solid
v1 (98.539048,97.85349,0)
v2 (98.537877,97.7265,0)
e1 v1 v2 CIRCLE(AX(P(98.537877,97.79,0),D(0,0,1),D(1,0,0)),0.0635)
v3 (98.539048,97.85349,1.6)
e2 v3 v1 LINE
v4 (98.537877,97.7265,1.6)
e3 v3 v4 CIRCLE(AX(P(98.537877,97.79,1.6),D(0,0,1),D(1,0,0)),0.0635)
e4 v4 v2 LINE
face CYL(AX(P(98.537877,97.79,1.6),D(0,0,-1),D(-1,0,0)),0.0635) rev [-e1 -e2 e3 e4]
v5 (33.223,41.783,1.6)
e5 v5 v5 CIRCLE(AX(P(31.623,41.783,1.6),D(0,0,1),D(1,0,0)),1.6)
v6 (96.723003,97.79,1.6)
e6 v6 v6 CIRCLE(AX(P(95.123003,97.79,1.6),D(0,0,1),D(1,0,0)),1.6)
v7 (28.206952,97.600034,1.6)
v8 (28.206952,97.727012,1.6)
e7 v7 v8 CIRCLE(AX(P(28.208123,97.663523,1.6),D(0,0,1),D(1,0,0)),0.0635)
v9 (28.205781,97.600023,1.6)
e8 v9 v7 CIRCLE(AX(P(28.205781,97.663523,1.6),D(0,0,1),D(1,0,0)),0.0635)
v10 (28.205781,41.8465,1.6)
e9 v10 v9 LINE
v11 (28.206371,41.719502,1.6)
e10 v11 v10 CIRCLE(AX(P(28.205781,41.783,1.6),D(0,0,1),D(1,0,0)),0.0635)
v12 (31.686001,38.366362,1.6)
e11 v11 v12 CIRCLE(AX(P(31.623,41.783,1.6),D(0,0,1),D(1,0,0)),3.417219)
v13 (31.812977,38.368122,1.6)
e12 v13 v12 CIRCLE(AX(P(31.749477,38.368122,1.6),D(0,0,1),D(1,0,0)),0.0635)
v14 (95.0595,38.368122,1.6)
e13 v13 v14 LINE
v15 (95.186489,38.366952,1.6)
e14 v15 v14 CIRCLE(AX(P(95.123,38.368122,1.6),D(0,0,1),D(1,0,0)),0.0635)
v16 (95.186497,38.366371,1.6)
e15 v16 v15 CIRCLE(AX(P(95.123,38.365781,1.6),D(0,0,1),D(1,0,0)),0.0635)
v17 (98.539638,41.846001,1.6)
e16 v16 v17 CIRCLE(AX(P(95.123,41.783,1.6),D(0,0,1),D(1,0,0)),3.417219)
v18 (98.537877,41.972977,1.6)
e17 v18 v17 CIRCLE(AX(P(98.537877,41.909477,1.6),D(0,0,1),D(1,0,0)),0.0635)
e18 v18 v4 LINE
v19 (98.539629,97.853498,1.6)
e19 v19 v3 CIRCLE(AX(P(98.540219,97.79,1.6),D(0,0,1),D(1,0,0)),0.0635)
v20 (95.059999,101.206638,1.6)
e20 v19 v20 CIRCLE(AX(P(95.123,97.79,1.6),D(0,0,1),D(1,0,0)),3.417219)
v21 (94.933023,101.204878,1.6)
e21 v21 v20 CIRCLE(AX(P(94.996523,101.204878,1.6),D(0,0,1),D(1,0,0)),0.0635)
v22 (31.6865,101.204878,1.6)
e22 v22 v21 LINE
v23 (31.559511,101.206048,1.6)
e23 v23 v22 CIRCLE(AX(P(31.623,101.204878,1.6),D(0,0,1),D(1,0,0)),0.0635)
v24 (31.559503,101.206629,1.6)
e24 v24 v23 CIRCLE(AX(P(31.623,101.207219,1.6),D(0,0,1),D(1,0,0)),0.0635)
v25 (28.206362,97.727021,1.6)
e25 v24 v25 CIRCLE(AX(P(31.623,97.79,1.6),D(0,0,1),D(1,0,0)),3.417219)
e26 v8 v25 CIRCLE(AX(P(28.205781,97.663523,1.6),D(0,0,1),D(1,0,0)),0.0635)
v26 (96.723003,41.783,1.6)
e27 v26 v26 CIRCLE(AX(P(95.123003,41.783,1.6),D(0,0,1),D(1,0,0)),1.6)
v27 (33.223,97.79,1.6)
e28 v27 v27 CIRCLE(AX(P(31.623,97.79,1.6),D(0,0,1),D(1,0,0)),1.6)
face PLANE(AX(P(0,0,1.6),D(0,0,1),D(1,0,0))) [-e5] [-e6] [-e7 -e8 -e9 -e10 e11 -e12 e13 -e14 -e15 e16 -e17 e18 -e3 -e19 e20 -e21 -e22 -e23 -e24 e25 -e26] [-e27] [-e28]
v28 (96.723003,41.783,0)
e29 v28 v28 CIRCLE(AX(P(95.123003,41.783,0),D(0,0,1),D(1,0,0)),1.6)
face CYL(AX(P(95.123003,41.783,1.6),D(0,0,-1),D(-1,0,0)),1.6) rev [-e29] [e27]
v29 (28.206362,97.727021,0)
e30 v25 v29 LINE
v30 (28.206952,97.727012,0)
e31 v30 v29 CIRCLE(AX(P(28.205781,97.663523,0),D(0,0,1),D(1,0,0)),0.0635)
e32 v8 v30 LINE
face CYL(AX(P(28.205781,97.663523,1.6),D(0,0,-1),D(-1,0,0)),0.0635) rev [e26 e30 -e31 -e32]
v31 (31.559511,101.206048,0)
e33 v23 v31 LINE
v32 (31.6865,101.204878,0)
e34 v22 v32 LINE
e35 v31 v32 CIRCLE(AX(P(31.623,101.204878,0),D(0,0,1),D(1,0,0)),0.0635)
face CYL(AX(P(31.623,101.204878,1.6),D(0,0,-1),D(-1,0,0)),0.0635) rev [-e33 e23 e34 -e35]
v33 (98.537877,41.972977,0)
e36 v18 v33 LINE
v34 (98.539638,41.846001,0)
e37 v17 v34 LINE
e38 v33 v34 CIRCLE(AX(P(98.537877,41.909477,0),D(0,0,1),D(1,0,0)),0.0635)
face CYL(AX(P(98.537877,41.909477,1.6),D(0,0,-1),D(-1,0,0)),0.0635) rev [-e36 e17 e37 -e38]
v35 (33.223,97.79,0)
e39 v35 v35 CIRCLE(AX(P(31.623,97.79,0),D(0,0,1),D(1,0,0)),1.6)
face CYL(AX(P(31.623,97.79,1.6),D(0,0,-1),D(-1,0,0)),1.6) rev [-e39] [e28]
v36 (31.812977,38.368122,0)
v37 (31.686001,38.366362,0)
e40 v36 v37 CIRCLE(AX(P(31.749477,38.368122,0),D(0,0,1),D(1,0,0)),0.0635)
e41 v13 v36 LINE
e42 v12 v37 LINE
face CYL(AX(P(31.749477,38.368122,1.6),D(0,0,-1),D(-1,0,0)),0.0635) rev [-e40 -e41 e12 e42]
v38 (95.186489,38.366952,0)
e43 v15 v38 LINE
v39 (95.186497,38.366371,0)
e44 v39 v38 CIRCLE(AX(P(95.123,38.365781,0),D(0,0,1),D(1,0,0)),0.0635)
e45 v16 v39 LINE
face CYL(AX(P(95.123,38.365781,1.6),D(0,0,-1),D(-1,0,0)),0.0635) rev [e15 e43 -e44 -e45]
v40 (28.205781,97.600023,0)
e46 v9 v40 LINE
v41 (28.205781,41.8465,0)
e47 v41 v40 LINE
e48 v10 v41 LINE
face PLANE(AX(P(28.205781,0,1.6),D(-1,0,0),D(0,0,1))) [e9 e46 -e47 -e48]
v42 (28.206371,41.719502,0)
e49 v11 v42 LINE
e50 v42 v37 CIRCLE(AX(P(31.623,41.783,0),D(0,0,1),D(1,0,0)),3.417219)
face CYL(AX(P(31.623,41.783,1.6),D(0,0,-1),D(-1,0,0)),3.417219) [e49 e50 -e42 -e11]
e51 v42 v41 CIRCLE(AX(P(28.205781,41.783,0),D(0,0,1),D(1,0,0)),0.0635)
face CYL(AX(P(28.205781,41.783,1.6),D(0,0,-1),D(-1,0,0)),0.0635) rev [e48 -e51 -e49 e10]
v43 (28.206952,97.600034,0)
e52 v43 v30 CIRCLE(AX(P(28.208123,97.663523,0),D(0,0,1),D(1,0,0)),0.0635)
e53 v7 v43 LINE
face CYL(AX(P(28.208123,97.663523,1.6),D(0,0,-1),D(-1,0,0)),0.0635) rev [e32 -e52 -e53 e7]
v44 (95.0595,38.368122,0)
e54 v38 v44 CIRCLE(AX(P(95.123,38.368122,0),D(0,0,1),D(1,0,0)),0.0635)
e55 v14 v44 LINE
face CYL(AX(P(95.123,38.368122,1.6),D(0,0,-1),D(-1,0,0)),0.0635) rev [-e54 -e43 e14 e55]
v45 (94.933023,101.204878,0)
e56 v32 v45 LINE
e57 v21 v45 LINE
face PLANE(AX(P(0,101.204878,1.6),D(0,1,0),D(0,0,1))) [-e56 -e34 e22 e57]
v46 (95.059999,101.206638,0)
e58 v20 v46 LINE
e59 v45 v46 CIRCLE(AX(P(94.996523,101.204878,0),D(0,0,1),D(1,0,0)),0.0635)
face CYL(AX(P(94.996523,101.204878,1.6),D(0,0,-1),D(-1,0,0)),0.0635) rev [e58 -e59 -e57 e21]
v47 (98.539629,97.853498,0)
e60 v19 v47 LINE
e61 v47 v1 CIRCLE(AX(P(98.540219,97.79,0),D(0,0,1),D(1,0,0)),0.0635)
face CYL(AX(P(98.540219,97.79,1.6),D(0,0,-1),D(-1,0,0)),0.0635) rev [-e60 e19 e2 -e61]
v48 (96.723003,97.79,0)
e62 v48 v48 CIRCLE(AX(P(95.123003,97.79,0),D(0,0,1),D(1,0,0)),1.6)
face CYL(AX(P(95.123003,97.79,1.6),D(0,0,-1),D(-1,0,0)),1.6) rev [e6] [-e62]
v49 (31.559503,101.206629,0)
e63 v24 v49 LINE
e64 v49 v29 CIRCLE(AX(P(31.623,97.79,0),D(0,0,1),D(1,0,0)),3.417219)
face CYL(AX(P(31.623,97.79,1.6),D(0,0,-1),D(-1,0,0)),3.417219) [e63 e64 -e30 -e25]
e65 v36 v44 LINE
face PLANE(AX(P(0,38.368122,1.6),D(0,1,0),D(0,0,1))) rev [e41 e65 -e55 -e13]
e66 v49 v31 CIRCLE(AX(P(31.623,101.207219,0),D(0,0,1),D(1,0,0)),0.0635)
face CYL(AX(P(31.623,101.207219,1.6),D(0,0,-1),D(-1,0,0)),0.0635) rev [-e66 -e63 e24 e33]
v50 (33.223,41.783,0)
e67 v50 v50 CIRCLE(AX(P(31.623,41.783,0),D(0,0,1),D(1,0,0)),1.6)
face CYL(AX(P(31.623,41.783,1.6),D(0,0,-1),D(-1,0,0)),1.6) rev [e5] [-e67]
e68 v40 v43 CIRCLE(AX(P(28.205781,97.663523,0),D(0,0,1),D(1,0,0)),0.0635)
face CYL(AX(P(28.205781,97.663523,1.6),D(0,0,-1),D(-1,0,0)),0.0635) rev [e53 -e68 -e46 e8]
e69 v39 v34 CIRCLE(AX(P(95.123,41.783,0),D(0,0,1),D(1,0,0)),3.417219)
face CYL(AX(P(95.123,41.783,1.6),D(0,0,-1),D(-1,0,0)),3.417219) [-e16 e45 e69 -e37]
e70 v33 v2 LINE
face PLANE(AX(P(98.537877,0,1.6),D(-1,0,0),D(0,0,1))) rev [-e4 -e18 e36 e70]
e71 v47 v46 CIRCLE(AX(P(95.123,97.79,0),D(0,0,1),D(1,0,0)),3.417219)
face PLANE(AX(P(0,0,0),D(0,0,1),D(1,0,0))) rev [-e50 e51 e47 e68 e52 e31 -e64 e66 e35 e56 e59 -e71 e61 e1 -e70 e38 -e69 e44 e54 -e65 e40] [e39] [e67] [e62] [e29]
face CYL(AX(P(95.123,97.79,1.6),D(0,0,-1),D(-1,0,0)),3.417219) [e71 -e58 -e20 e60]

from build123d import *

# Parameters (mm, degrees)
EXTRUDE_1_DEPTH     = 1.6
VIAHOLELAYER_R      = 1.6
CUT_EXTRUDE_2_DEPTH = 1.6


# Read off the part's stored shape, not the designer's step: 凸台-拉伸1
with BuildPart() as part:
    # 凸台-拉伸1 outline → 凸台-拉伸1 (new body)
    with BuildSketch(Plane.XY):
        with BuildLine():
            Line((28.205781396, 97.600023259), (28.205781396, 41.846499647))
            ThreePointArc((28.205781396, 41.846499647), (28.269280711, 41.783294645), (28.206371386, 41.719502388))
            ThreePointArc((28.206371386, 41.719502388), (29.251799434, 39.322351184), (31.68600117, 38.36636185))
            ThreePointArc((31.68600117, 38.36636185), (31.7485964, 38.431616297), (31.81297676, 38.3681224))
            Line((31.81297676, 38.3681224), (95.0595, 38.3681224))
            ThreePointArc((95.0595, 38.3681224), (95.123585364, 38.431619702), (95.186489208, 38.366951722))
            ThreePointArc((95.186489208, 38.366951722), (95.186493897, 38.366661387), (95.186497259, 38.366371034))
            ThreePointArc((95.186497259, 38.366371034), (97.583648579, 39.411799201), (98.539637791, 41.846001151))
            ThreePointArc((98.539637791, 41.846001151), (98.474383338, 41.908596378), (98.537877235, 41.972976741))
            Line((98.537877235, 41.972976741), (98.537877235, 97.726500353))
            ThreePointArc((98.537877235, 97.726500353), (98.474379933, 97.79058572), (98.539047919, 97.85348956))
            ThreePointArc((98.539047919, 97.85348956), (98.539338257, 97.85349425), (98.539628614, 97.853497612))
            ThreePointArc((98.539628614, 97.853497612), (97.494200566, 100.250648816), (95.05999883, 101.20663815))
            ThreePointArc((95.05999883, 101.20663815), (94.9974036, 101.141383703), (94.93302324, 101.2048776))
            Line((94.93302324, 101.2048776), (31.6865, 101.2048776))
            ThreePointArc((31.6865, 101.2048776), (31.622414636, 101.141380298), (31.559510792, 101.206048278))
            ThreePointArc((31.559510792, 101.206048278), (31.559506103, 101.206338613), (31.559502741, 101.206628966))
            ThreePointArc((31.559502741, 101.206628966), (29.162358971, 100.161208634), (28.206361808, 97.727020607))
            ThreePointArc((28.206361808, 97.727020607), (28.206656954, 97.727017223), (28.206952081, 97.727012467))
            ThreePointArc((28.206952081, 97.727012467), (28.271622765, 97.663523259), (28.206952081, 97.600034052))
            ThreePointArc((28.206952081, 97.600034052), (28.206366763, 97.600025958), (28.205781396, 97.600023259))
        make_face()
    extrude(amount=EXTRUDE_1_DEPTH)

    # ViaHoleLayer → 切除-拉伸2 (cut)
    with BuildSketch(Plane.XY):
        with Locations((95.12300254, 97.79)):
            Circle(VIAHOLELAYER_R)
        with Locations((95.12300254, 41.783)):
            Circle(VIAHOLELAYER_R)
        with Locations((31.623, 41.783)):
            Circle(VIAHOLELAYER_R)
        with Locations((31.623, 97.79)):
            Circle(VIAHOLELAYER_R)
    extrude(amount=CUT_EXTRUDE_2_DEPTH, mode=Mode.SUBTRACT)


solid = part.part
